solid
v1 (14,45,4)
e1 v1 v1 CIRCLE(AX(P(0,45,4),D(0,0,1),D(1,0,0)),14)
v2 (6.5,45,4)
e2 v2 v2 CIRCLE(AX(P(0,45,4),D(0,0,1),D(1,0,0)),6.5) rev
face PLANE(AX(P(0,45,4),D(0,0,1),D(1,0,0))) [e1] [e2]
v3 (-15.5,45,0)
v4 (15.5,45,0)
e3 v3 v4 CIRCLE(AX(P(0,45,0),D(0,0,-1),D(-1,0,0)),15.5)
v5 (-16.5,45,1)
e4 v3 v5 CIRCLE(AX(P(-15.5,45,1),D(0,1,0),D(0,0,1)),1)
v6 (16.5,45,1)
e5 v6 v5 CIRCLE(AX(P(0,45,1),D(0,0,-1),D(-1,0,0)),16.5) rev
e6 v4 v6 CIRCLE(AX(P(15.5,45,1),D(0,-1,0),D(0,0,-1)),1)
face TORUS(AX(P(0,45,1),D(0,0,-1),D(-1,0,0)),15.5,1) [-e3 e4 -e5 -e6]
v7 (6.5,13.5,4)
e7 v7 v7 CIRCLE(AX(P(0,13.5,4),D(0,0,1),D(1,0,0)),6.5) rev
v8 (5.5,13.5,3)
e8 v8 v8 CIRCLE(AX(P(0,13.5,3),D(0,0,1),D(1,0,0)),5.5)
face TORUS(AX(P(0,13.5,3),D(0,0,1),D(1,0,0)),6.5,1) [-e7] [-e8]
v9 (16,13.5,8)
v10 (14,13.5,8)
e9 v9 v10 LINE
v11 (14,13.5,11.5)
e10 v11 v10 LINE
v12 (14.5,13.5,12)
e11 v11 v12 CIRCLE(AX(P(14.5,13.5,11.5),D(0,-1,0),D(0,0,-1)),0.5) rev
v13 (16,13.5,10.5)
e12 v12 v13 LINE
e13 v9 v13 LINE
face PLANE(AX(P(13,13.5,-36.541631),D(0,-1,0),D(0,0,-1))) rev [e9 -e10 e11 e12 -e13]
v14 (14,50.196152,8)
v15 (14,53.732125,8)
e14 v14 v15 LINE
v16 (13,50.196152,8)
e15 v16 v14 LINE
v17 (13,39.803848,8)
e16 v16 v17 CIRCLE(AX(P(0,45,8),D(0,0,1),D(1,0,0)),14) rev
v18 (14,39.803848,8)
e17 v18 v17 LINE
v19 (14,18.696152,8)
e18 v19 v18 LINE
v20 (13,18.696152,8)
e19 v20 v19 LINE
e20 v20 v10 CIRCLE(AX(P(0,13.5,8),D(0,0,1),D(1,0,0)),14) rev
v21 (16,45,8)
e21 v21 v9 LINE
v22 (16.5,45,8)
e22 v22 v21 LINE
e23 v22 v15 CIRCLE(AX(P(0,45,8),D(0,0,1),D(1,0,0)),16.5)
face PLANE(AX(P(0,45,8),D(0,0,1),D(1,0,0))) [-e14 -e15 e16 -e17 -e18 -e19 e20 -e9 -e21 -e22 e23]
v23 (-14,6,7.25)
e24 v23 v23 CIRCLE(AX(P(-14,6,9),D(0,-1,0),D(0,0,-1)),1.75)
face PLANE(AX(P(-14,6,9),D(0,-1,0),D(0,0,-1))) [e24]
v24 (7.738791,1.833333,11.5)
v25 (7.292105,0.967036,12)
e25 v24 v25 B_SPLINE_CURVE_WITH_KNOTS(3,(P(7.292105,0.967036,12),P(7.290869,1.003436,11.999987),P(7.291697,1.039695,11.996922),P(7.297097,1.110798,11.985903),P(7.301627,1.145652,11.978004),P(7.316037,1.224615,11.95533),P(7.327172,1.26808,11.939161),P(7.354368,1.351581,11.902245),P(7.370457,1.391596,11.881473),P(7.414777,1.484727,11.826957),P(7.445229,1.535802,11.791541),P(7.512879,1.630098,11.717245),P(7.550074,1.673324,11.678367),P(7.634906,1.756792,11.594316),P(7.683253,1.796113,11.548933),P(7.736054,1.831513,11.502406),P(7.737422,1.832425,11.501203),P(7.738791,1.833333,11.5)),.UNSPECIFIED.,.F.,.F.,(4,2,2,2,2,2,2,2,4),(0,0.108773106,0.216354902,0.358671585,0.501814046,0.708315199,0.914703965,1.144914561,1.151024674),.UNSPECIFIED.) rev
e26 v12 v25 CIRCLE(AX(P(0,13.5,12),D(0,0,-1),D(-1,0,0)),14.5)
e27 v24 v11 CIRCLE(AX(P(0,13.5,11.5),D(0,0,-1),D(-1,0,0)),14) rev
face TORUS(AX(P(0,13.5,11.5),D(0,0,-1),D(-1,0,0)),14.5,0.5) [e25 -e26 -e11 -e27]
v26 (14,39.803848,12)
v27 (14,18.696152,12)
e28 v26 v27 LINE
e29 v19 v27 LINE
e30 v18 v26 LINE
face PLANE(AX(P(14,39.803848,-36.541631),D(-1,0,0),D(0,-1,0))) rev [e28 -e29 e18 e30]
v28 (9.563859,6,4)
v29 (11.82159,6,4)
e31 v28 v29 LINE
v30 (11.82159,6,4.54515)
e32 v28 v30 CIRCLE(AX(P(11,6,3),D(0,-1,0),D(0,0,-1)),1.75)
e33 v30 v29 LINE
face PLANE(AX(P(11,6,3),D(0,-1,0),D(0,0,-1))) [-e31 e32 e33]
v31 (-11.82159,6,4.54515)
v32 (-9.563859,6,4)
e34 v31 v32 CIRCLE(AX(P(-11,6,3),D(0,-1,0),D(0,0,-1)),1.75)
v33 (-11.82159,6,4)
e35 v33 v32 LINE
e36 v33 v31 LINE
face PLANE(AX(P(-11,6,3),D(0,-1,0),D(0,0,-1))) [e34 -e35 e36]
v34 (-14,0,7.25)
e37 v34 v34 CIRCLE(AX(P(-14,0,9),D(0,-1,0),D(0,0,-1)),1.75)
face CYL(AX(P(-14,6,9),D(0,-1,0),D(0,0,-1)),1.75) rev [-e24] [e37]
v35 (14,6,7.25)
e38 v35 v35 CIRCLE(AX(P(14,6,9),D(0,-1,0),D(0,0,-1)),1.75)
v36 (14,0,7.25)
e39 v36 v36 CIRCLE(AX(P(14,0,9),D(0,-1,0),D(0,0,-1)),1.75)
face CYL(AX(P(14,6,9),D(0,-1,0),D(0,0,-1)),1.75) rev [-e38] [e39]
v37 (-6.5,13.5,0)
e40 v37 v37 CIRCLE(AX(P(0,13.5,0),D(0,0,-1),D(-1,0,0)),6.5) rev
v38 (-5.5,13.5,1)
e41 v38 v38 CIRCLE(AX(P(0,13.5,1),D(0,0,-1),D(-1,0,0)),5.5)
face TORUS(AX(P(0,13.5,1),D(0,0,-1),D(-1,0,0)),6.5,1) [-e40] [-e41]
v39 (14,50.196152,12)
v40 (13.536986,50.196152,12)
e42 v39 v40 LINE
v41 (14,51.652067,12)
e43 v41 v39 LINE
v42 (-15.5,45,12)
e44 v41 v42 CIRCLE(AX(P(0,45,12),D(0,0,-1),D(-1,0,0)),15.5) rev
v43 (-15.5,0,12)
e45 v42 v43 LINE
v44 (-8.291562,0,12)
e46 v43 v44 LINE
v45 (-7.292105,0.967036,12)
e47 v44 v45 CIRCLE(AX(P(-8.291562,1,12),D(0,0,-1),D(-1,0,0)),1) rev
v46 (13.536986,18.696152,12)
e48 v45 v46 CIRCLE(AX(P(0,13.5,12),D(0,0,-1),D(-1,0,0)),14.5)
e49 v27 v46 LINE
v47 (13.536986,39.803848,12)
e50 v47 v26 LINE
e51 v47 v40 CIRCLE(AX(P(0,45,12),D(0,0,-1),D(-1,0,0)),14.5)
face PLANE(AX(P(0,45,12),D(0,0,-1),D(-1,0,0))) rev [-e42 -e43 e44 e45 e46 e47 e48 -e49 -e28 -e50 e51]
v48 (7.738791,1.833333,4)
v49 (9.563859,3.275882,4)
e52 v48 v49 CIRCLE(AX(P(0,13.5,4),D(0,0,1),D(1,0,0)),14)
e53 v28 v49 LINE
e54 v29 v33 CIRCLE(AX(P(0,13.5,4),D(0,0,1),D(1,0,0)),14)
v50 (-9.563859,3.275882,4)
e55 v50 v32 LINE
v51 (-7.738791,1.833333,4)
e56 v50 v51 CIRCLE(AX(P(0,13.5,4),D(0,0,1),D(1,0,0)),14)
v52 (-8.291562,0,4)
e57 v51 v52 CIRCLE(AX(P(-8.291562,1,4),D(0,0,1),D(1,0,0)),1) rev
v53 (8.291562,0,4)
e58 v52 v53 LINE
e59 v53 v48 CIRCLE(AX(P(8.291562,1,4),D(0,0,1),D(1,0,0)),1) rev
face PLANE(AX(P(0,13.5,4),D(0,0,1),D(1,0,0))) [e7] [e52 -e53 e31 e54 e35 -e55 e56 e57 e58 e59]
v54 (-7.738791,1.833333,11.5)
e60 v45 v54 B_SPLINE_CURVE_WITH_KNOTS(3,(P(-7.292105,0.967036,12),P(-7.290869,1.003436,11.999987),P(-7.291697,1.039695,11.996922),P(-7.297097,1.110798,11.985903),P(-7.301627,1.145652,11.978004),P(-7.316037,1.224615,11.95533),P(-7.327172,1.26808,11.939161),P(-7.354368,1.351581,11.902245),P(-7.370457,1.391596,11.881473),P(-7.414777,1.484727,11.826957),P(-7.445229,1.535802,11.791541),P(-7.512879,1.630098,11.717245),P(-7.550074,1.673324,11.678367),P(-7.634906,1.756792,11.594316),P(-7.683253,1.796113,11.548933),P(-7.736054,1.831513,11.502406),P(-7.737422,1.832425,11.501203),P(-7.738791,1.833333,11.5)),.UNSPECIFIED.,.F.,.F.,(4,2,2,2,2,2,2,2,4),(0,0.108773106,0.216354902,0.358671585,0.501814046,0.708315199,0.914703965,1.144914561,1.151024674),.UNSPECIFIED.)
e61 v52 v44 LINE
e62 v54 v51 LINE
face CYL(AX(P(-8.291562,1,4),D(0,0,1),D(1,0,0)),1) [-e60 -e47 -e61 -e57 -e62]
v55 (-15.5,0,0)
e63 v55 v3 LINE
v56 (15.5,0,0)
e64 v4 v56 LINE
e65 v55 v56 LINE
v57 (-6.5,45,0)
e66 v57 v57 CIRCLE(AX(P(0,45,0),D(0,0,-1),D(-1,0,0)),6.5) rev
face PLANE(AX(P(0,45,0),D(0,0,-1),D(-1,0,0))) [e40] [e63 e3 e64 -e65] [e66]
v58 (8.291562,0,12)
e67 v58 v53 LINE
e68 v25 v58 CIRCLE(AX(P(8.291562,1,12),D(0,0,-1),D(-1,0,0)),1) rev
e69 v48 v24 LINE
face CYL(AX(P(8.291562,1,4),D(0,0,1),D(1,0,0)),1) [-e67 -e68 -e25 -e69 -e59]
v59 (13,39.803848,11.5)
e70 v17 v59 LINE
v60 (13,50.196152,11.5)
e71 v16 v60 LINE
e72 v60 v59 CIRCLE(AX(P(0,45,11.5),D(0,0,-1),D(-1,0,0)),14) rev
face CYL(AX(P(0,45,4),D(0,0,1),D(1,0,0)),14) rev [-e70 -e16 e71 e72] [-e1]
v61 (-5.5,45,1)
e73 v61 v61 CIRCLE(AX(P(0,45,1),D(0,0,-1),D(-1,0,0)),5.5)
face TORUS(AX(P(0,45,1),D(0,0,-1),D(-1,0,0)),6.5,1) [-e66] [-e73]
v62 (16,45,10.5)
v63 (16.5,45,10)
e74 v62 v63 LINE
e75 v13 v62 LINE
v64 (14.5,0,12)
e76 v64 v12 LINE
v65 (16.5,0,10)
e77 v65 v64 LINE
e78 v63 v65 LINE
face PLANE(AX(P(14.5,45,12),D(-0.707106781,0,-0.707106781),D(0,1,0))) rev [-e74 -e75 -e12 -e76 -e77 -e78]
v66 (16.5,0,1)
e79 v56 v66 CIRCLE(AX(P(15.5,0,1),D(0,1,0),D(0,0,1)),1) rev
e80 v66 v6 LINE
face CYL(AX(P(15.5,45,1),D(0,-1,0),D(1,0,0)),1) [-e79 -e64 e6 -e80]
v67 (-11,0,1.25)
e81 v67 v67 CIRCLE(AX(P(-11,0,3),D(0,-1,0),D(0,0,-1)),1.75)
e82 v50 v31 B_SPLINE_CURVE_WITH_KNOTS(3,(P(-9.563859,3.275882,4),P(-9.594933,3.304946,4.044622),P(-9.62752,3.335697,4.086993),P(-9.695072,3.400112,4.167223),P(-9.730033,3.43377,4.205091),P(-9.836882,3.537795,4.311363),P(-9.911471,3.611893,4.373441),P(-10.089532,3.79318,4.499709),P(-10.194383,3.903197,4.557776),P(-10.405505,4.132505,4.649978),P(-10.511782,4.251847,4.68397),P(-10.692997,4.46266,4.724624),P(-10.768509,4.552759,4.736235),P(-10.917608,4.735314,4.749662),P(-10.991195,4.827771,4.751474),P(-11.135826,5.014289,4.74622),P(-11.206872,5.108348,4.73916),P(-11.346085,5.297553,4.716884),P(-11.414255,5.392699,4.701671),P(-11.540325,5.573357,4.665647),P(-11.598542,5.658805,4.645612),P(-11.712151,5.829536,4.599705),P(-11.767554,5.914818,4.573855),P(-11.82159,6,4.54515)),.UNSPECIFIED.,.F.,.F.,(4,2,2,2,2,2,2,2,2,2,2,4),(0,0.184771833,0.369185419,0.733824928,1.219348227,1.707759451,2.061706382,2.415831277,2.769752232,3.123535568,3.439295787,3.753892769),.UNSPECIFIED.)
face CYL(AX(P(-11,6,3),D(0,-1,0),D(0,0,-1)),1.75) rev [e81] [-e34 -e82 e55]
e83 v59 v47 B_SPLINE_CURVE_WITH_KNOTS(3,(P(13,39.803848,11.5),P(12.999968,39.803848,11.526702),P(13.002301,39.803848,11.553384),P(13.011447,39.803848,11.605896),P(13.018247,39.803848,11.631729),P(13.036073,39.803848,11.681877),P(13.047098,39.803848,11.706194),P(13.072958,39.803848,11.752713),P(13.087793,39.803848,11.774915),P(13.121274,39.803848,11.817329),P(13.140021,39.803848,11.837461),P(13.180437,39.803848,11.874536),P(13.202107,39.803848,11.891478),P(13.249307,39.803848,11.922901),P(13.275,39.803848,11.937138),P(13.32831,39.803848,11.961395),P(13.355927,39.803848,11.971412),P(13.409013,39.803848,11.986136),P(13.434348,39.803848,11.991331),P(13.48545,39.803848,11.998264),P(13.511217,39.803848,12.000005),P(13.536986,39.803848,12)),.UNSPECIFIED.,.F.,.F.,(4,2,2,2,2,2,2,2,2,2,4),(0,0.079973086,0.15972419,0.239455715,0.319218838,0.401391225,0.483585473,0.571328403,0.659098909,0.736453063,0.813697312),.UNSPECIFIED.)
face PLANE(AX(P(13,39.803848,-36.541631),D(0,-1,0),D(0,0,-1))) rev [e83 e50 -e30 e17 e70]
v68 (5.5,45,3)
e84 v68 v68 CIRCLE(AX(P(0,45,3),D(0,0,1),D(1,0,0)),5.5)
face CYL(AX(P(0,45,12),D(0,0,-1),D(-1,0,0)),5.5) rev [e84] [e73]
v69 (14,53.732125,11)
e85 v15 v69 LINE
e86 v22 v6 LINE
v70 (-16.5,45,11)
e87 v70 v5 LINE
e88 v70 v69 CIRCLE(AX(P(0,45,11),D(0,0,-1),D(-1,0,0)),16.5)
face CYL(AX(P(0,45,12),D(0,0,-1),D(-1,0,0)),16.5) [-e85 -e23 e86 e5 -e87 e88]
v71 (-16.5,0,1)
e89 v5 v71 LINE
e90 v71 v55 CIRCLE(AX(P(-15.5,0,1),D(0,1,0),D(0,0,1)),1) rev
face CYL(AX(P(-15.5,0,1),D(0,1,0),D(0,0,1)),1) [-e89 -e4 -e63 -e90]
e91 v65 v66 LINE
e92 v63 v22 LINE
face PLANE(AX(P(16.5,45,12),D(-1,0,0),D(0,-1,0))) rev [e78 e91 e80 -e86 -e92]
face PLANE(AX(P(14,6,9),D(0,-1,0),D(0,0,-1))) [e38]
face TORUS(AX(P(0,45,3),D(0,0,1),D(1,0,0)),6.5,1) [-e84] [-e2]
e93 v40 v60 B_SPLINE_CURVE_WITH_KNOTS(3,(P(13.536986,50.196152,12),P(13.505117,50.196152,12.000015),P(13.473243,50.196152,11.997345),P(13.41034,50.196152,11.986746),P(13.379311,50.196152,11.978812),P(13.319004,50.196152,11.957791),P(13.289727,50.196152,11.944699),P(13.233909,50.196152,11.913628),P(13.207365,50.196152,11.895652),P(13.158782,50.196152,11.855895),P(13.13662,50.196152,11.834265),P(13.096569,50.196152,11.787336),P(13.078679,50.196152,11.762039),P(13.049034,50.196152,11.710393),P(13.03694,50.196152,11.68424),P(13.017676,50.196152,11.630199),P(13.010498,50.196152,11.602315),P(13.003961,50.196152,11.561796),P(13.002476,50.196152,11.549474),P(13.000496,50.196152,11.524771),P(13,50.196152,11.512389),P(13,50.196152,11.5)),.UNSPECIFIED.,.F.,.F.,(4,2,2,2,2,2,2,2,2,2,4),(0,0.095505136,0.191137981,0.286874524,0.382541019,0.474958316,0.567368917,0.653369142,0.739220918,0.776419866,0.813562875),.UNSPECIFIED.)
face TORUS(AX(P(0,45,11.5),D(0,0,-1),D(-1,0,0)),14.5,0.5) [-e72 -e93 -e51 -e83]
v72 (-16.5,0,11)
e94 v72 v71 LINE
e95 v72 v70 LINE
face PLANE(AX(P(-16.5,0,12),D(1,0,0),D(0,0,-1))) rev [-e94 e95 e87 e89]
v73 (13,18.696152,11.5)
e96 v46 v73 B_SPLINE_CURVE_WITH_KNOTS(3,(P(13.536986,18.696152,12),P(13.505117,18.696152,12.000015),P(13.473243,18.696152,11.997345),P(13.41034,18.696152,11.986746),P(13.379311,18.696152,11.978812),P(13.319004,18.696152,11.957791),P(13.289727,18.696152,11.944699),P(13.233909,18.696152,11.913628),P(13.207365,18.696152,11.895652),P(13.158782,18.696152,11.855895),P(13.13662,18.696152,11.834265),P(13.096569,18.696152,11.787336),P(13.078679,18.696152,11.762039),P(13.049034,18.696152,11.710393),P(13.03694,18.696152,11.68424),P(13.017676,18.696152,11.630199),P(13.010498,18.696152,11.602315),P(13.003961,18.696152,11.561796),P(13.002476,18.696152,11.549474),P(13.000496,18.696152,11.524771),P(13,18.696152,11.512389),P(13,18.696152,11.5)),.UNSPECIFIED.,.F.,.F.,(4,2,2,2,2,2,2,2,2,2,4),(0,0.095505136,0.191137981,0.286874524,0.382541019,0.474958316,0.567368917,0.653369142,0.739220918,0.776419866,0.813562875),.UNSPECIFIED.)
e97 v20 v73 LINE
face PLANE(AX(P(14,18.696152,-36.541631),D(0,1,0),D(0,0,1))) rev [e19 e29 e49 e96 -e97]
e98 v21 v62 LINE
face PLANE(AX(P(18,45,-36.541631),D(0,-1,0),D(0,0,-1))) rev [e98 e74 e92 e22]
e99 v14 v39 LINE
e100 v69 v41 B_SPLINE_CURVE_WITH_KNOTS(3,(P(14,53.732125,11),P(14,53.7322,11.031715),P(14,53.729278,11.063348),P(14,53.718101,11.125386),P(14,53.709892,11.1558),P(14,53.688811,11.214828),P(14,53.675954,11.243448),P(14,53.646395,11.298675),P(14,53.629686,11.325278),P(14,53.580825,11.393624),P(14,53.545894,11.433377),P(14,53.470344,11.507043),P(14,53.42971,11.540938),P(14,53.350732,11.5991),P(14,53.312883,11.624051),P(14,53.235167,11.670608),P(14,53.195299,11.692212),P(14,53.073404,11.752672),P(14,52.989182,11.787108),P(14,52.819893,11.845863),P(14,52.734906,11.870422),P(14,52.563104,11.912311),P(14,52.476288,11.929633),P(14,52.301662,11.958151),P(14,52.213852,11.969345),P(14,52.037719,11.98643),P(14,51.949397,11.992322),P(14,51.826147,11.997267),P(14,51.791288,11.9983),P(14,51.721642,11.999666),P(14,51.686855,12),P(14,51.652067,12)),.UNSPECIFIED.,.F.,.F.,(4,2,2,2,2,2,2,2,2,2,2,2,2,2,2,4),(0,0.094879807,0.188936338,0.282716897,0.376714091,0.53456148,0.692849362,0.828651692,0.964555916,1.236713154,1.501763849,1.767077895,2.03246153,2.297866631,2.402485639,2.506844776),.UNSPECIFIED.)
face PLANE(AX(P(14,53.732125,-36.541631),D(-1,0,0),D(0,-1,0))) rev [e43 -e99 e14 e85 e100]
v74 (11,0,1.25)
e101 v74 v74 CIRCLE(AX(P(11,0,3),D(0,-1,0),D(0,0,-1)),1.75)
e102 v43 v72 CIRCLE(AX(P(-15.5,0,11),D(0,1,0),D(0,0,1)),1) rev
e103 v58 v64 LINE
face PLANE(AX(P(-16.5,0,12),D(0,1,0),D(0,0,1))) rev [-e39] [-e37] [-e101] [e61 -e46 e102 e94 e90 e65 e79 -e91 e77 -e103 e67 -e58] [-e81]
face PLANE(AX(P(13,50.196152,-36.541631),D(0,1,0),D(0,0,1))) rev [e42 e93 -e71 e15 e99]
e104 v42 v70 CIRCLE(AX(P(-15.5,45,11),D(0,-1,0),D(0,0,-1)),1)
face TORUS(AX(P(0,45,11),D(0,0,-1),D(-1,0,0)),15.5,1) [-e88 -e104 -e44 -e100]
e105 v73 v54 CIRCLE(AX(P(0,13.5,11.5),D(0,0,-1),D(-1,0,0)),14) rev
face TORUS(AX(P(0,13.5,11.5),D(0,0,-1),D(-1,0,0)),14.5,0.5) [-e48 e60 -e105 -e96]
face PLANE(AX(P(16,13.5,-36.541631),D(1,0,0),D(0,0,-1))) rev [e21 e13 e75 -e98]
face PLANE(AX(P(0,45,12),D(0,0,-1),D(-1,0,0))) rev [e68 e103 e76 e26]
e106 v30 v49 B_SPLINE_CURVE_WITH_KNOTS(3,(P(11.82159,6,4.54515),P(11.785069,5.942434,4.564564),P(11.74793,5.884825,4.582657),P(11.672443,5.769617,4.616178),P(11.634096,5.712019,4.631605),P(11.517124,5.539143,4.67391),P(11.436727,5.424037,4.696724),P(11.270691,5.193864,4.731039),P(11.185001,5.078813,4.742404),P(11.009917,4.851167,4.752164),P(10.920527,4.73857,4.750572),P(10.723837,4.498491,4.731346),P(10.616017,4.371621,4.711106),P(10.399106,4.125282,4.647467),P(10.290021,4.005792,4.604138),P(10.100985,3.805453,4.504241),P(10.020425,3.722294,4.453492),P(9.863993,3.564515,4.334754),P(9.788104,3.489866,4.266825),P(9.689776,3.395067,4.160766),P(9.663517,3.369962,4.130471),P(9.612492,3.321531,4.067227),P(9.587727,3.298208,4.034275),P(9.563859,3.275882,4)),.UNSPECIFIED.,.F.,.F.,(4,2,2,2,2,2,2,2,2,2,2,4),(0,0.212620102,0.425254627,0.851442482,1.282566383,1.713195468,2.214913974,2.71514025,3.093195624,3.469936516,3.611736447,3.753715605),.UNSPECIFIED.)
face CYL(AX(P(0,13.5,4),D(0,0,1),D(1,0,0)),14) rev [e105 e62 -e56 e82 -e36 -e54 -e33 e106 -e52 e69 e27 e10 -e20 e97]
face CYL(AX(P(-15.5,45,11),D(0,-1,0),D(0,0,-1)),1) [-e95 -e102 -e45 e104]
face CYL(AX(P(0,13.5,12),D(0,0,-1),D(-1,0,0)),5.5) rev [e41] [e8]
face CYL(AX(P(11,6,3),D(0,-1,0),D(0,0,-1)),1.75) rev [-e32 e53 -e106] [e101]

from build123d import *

# Parameters (mm, degrees)
ESBO_O1_R                = 5.5
RESSALTO_EXTRUS_O1_DEPTH = 12
ESBO_O2_R                = 14
CORTE_EXTRUS_O1_DEPTH    = 8
CORTE_EXTRUS_O2_DEPTH    = 4
FILETE7_R                = 1
FILETE9_R                = 0.5
ESBO_O6_R                = 1.75
CORTE_EXTRUS_O3_DEPTH    = 6
CHANFRO1_SIZE            = 2
FILETE10_R               = 1


with BuildPart() as part:
    # Esboço1 → Ressalto-extrusão1 (new body)
    with BuildSketch(Plane.XY):
        with BuildLine():
            Line((-16.5, 0), (-16.5, 45))
            ThreePointArc((-16.5, 45), (0, 61.5), (16.5, 45))
            Line((16.5, 45), (16.5, 0))
            Line((16.5, 0), (-16.5, 0))
        make_face()
        with Locations((0, 45)):
            Circle(ESBO_O1_R, mode=Mode.SUBTRACT)
        with Locations((0, 13.5)):
            Circle(ESBO_O1_R, mode=Mode.SUBTRACT)
    extrude(amount=RESSALTO_EXTRUS_O1_DEPTH)

    # Esboço2 → Corte-extrusão1 (cut)
    with BuildSketch(Plane.XY.offset(12)):
        with Locations((0, 45)):
            Circle(ESBO_O2_R)
        with Locations((0, 13.5)):
            Circle(ESBO_O2_R)
    extrude(amount=-CORTE_EXTRUS_O1_DEPTH, mode=Mode.SUBTRACT)

    # Esboço5 → Corte-extrusão2 (cut)
    with BuildSketch(Plane.XY.offset(12)):
        Polygon((16, 13.5), (16, 45), (16.5, 45), (18, 45), (18, 49.031128874), (16, 49.031128874), (16, 53.732124598), (14, 53.732124598), (14, 50.196152423), (13, 50.196152423), (13, 39.803847577), (14, 39.803847577), (14, 18.696152423), (13, 18.696152423), (13, 13.5), (14, 13.5), align=None)
    extrude(amount=-CORTE_EXTRUS_O2_DEPTH, mode=Mode.SUBTRACT)

    # Filete7
    filete7_edges = [part.edges().sort_by_distance(p)[0] for p in [
        (-5.5, 45, 0),
        (-5.5, 13.5, 0),
        (-16.5, 22.5, 12),
        (-5.5, 45, 4),
        (-5.5, 13.5, 4),
        (-4.541475531, 60.862692079, 12),
        (-16.5, 22.5, 0),
        (0, 61.5, 0),
        (16.5, 22.5, 0),
    ]]
    fillet(filete7_edges, radius=FILETE7_R)

    # Filete9
    filete9_edges = [part.edges().sort_by_distance(p)[0] for p in [
        (-14, 45, 12),
        (11.133584091, 5.01216722, 12),
        (-10.43893595, 22.828912918, 12),
    ]]
    fillet(filete9_edges, radius=FILETE9_R)

    # Esboço6 → Corte-extrusão3 (cut)
    with BuildSketch(Plane.XZ):
        with Locations(Location((-14, 9, 0), (0, 0, 270))):
            Circle(ESBO_O6_R)
        with Locations(Location((14, 9, 0), (0, 0, 270))):
            Circle(ESBO_O6_R)
        with Locations(Location((11, 3, 0), (0, 0, 270))):
            Circle(ESBO_O6_R)
        with Locations(Location((-11, 3, 0), (0, 0, 270))):
            Circle(ESBO_O6_R)
    extrude(amount=-CORTE_EXTRUS_O3_DEPTH, mode=Mode.SUBTRACT)

    # Chanfro1
    chanfro1_edges = [part.edges().sort_by_distance(p)[0] for p in [
        (16.5, 22.5, 12),
    ]]
    chamfer(chanfro1_edges, length=CHANFRO1_SIZE)

    # Filete10
    # the kernel refuses this fillet: 1 mm, written as the material it takes off along each edge
    with BuildSketch(Plane(origin=(3.708099244, 0, 4), x_dir=(1, 0, 0), z_dir=(0, 0, 1))) as filete10_piece_1:
        with BuildLine():
            CenterArc((4.583462732, 1), FILETE10_R, 123.557309762, 146.442690238)
            Line((4.030691934, 1.833333333), (4.019636518, 1.85))
            ThreePointArc((4.019636518, 1.85), (2.080007255, 0.774504994), (-0.005297285, 0.019285714))
            Line((-0.005297285, 0.019285714), (0, -0.02))
            Line((0, -0.02), (4.583462732, -0.02))
            Line((4.583462732, -0.02), (4.583462732, 0))
        make_face()
    extrude(amount=12.083462732, mode=Mode.SUBTRACT)
    with BuildSketch(Plane(origin=(-3.708099244, 0, 4), x_dir=(-1, 0, 0), z_dir=(0, 0, 1))) as filete10_piece_2:
        with BuildLine():
            CenterArc((4.583462732, -1), FILETE10_R, 90, 146.442690238)
            Line((4.030691934, -1.833333333), (4.019636518, -1.85))
            ThreePointArc((4.019636518, -1.85), (2.080007255, -0.774504994), (-0.005297285, -0.019285714))
            Line((-0.005297285, -0.019285714), (0, 0.02))
            Line((0, 0.02), (4.583462732, 0.02))
            Line((4.583462732, 0.02), (4.583462732, 0))
        make_face()
    extrude(amount=12.083462732, mode=Mode.SUBTRACT)


solid = part.part
